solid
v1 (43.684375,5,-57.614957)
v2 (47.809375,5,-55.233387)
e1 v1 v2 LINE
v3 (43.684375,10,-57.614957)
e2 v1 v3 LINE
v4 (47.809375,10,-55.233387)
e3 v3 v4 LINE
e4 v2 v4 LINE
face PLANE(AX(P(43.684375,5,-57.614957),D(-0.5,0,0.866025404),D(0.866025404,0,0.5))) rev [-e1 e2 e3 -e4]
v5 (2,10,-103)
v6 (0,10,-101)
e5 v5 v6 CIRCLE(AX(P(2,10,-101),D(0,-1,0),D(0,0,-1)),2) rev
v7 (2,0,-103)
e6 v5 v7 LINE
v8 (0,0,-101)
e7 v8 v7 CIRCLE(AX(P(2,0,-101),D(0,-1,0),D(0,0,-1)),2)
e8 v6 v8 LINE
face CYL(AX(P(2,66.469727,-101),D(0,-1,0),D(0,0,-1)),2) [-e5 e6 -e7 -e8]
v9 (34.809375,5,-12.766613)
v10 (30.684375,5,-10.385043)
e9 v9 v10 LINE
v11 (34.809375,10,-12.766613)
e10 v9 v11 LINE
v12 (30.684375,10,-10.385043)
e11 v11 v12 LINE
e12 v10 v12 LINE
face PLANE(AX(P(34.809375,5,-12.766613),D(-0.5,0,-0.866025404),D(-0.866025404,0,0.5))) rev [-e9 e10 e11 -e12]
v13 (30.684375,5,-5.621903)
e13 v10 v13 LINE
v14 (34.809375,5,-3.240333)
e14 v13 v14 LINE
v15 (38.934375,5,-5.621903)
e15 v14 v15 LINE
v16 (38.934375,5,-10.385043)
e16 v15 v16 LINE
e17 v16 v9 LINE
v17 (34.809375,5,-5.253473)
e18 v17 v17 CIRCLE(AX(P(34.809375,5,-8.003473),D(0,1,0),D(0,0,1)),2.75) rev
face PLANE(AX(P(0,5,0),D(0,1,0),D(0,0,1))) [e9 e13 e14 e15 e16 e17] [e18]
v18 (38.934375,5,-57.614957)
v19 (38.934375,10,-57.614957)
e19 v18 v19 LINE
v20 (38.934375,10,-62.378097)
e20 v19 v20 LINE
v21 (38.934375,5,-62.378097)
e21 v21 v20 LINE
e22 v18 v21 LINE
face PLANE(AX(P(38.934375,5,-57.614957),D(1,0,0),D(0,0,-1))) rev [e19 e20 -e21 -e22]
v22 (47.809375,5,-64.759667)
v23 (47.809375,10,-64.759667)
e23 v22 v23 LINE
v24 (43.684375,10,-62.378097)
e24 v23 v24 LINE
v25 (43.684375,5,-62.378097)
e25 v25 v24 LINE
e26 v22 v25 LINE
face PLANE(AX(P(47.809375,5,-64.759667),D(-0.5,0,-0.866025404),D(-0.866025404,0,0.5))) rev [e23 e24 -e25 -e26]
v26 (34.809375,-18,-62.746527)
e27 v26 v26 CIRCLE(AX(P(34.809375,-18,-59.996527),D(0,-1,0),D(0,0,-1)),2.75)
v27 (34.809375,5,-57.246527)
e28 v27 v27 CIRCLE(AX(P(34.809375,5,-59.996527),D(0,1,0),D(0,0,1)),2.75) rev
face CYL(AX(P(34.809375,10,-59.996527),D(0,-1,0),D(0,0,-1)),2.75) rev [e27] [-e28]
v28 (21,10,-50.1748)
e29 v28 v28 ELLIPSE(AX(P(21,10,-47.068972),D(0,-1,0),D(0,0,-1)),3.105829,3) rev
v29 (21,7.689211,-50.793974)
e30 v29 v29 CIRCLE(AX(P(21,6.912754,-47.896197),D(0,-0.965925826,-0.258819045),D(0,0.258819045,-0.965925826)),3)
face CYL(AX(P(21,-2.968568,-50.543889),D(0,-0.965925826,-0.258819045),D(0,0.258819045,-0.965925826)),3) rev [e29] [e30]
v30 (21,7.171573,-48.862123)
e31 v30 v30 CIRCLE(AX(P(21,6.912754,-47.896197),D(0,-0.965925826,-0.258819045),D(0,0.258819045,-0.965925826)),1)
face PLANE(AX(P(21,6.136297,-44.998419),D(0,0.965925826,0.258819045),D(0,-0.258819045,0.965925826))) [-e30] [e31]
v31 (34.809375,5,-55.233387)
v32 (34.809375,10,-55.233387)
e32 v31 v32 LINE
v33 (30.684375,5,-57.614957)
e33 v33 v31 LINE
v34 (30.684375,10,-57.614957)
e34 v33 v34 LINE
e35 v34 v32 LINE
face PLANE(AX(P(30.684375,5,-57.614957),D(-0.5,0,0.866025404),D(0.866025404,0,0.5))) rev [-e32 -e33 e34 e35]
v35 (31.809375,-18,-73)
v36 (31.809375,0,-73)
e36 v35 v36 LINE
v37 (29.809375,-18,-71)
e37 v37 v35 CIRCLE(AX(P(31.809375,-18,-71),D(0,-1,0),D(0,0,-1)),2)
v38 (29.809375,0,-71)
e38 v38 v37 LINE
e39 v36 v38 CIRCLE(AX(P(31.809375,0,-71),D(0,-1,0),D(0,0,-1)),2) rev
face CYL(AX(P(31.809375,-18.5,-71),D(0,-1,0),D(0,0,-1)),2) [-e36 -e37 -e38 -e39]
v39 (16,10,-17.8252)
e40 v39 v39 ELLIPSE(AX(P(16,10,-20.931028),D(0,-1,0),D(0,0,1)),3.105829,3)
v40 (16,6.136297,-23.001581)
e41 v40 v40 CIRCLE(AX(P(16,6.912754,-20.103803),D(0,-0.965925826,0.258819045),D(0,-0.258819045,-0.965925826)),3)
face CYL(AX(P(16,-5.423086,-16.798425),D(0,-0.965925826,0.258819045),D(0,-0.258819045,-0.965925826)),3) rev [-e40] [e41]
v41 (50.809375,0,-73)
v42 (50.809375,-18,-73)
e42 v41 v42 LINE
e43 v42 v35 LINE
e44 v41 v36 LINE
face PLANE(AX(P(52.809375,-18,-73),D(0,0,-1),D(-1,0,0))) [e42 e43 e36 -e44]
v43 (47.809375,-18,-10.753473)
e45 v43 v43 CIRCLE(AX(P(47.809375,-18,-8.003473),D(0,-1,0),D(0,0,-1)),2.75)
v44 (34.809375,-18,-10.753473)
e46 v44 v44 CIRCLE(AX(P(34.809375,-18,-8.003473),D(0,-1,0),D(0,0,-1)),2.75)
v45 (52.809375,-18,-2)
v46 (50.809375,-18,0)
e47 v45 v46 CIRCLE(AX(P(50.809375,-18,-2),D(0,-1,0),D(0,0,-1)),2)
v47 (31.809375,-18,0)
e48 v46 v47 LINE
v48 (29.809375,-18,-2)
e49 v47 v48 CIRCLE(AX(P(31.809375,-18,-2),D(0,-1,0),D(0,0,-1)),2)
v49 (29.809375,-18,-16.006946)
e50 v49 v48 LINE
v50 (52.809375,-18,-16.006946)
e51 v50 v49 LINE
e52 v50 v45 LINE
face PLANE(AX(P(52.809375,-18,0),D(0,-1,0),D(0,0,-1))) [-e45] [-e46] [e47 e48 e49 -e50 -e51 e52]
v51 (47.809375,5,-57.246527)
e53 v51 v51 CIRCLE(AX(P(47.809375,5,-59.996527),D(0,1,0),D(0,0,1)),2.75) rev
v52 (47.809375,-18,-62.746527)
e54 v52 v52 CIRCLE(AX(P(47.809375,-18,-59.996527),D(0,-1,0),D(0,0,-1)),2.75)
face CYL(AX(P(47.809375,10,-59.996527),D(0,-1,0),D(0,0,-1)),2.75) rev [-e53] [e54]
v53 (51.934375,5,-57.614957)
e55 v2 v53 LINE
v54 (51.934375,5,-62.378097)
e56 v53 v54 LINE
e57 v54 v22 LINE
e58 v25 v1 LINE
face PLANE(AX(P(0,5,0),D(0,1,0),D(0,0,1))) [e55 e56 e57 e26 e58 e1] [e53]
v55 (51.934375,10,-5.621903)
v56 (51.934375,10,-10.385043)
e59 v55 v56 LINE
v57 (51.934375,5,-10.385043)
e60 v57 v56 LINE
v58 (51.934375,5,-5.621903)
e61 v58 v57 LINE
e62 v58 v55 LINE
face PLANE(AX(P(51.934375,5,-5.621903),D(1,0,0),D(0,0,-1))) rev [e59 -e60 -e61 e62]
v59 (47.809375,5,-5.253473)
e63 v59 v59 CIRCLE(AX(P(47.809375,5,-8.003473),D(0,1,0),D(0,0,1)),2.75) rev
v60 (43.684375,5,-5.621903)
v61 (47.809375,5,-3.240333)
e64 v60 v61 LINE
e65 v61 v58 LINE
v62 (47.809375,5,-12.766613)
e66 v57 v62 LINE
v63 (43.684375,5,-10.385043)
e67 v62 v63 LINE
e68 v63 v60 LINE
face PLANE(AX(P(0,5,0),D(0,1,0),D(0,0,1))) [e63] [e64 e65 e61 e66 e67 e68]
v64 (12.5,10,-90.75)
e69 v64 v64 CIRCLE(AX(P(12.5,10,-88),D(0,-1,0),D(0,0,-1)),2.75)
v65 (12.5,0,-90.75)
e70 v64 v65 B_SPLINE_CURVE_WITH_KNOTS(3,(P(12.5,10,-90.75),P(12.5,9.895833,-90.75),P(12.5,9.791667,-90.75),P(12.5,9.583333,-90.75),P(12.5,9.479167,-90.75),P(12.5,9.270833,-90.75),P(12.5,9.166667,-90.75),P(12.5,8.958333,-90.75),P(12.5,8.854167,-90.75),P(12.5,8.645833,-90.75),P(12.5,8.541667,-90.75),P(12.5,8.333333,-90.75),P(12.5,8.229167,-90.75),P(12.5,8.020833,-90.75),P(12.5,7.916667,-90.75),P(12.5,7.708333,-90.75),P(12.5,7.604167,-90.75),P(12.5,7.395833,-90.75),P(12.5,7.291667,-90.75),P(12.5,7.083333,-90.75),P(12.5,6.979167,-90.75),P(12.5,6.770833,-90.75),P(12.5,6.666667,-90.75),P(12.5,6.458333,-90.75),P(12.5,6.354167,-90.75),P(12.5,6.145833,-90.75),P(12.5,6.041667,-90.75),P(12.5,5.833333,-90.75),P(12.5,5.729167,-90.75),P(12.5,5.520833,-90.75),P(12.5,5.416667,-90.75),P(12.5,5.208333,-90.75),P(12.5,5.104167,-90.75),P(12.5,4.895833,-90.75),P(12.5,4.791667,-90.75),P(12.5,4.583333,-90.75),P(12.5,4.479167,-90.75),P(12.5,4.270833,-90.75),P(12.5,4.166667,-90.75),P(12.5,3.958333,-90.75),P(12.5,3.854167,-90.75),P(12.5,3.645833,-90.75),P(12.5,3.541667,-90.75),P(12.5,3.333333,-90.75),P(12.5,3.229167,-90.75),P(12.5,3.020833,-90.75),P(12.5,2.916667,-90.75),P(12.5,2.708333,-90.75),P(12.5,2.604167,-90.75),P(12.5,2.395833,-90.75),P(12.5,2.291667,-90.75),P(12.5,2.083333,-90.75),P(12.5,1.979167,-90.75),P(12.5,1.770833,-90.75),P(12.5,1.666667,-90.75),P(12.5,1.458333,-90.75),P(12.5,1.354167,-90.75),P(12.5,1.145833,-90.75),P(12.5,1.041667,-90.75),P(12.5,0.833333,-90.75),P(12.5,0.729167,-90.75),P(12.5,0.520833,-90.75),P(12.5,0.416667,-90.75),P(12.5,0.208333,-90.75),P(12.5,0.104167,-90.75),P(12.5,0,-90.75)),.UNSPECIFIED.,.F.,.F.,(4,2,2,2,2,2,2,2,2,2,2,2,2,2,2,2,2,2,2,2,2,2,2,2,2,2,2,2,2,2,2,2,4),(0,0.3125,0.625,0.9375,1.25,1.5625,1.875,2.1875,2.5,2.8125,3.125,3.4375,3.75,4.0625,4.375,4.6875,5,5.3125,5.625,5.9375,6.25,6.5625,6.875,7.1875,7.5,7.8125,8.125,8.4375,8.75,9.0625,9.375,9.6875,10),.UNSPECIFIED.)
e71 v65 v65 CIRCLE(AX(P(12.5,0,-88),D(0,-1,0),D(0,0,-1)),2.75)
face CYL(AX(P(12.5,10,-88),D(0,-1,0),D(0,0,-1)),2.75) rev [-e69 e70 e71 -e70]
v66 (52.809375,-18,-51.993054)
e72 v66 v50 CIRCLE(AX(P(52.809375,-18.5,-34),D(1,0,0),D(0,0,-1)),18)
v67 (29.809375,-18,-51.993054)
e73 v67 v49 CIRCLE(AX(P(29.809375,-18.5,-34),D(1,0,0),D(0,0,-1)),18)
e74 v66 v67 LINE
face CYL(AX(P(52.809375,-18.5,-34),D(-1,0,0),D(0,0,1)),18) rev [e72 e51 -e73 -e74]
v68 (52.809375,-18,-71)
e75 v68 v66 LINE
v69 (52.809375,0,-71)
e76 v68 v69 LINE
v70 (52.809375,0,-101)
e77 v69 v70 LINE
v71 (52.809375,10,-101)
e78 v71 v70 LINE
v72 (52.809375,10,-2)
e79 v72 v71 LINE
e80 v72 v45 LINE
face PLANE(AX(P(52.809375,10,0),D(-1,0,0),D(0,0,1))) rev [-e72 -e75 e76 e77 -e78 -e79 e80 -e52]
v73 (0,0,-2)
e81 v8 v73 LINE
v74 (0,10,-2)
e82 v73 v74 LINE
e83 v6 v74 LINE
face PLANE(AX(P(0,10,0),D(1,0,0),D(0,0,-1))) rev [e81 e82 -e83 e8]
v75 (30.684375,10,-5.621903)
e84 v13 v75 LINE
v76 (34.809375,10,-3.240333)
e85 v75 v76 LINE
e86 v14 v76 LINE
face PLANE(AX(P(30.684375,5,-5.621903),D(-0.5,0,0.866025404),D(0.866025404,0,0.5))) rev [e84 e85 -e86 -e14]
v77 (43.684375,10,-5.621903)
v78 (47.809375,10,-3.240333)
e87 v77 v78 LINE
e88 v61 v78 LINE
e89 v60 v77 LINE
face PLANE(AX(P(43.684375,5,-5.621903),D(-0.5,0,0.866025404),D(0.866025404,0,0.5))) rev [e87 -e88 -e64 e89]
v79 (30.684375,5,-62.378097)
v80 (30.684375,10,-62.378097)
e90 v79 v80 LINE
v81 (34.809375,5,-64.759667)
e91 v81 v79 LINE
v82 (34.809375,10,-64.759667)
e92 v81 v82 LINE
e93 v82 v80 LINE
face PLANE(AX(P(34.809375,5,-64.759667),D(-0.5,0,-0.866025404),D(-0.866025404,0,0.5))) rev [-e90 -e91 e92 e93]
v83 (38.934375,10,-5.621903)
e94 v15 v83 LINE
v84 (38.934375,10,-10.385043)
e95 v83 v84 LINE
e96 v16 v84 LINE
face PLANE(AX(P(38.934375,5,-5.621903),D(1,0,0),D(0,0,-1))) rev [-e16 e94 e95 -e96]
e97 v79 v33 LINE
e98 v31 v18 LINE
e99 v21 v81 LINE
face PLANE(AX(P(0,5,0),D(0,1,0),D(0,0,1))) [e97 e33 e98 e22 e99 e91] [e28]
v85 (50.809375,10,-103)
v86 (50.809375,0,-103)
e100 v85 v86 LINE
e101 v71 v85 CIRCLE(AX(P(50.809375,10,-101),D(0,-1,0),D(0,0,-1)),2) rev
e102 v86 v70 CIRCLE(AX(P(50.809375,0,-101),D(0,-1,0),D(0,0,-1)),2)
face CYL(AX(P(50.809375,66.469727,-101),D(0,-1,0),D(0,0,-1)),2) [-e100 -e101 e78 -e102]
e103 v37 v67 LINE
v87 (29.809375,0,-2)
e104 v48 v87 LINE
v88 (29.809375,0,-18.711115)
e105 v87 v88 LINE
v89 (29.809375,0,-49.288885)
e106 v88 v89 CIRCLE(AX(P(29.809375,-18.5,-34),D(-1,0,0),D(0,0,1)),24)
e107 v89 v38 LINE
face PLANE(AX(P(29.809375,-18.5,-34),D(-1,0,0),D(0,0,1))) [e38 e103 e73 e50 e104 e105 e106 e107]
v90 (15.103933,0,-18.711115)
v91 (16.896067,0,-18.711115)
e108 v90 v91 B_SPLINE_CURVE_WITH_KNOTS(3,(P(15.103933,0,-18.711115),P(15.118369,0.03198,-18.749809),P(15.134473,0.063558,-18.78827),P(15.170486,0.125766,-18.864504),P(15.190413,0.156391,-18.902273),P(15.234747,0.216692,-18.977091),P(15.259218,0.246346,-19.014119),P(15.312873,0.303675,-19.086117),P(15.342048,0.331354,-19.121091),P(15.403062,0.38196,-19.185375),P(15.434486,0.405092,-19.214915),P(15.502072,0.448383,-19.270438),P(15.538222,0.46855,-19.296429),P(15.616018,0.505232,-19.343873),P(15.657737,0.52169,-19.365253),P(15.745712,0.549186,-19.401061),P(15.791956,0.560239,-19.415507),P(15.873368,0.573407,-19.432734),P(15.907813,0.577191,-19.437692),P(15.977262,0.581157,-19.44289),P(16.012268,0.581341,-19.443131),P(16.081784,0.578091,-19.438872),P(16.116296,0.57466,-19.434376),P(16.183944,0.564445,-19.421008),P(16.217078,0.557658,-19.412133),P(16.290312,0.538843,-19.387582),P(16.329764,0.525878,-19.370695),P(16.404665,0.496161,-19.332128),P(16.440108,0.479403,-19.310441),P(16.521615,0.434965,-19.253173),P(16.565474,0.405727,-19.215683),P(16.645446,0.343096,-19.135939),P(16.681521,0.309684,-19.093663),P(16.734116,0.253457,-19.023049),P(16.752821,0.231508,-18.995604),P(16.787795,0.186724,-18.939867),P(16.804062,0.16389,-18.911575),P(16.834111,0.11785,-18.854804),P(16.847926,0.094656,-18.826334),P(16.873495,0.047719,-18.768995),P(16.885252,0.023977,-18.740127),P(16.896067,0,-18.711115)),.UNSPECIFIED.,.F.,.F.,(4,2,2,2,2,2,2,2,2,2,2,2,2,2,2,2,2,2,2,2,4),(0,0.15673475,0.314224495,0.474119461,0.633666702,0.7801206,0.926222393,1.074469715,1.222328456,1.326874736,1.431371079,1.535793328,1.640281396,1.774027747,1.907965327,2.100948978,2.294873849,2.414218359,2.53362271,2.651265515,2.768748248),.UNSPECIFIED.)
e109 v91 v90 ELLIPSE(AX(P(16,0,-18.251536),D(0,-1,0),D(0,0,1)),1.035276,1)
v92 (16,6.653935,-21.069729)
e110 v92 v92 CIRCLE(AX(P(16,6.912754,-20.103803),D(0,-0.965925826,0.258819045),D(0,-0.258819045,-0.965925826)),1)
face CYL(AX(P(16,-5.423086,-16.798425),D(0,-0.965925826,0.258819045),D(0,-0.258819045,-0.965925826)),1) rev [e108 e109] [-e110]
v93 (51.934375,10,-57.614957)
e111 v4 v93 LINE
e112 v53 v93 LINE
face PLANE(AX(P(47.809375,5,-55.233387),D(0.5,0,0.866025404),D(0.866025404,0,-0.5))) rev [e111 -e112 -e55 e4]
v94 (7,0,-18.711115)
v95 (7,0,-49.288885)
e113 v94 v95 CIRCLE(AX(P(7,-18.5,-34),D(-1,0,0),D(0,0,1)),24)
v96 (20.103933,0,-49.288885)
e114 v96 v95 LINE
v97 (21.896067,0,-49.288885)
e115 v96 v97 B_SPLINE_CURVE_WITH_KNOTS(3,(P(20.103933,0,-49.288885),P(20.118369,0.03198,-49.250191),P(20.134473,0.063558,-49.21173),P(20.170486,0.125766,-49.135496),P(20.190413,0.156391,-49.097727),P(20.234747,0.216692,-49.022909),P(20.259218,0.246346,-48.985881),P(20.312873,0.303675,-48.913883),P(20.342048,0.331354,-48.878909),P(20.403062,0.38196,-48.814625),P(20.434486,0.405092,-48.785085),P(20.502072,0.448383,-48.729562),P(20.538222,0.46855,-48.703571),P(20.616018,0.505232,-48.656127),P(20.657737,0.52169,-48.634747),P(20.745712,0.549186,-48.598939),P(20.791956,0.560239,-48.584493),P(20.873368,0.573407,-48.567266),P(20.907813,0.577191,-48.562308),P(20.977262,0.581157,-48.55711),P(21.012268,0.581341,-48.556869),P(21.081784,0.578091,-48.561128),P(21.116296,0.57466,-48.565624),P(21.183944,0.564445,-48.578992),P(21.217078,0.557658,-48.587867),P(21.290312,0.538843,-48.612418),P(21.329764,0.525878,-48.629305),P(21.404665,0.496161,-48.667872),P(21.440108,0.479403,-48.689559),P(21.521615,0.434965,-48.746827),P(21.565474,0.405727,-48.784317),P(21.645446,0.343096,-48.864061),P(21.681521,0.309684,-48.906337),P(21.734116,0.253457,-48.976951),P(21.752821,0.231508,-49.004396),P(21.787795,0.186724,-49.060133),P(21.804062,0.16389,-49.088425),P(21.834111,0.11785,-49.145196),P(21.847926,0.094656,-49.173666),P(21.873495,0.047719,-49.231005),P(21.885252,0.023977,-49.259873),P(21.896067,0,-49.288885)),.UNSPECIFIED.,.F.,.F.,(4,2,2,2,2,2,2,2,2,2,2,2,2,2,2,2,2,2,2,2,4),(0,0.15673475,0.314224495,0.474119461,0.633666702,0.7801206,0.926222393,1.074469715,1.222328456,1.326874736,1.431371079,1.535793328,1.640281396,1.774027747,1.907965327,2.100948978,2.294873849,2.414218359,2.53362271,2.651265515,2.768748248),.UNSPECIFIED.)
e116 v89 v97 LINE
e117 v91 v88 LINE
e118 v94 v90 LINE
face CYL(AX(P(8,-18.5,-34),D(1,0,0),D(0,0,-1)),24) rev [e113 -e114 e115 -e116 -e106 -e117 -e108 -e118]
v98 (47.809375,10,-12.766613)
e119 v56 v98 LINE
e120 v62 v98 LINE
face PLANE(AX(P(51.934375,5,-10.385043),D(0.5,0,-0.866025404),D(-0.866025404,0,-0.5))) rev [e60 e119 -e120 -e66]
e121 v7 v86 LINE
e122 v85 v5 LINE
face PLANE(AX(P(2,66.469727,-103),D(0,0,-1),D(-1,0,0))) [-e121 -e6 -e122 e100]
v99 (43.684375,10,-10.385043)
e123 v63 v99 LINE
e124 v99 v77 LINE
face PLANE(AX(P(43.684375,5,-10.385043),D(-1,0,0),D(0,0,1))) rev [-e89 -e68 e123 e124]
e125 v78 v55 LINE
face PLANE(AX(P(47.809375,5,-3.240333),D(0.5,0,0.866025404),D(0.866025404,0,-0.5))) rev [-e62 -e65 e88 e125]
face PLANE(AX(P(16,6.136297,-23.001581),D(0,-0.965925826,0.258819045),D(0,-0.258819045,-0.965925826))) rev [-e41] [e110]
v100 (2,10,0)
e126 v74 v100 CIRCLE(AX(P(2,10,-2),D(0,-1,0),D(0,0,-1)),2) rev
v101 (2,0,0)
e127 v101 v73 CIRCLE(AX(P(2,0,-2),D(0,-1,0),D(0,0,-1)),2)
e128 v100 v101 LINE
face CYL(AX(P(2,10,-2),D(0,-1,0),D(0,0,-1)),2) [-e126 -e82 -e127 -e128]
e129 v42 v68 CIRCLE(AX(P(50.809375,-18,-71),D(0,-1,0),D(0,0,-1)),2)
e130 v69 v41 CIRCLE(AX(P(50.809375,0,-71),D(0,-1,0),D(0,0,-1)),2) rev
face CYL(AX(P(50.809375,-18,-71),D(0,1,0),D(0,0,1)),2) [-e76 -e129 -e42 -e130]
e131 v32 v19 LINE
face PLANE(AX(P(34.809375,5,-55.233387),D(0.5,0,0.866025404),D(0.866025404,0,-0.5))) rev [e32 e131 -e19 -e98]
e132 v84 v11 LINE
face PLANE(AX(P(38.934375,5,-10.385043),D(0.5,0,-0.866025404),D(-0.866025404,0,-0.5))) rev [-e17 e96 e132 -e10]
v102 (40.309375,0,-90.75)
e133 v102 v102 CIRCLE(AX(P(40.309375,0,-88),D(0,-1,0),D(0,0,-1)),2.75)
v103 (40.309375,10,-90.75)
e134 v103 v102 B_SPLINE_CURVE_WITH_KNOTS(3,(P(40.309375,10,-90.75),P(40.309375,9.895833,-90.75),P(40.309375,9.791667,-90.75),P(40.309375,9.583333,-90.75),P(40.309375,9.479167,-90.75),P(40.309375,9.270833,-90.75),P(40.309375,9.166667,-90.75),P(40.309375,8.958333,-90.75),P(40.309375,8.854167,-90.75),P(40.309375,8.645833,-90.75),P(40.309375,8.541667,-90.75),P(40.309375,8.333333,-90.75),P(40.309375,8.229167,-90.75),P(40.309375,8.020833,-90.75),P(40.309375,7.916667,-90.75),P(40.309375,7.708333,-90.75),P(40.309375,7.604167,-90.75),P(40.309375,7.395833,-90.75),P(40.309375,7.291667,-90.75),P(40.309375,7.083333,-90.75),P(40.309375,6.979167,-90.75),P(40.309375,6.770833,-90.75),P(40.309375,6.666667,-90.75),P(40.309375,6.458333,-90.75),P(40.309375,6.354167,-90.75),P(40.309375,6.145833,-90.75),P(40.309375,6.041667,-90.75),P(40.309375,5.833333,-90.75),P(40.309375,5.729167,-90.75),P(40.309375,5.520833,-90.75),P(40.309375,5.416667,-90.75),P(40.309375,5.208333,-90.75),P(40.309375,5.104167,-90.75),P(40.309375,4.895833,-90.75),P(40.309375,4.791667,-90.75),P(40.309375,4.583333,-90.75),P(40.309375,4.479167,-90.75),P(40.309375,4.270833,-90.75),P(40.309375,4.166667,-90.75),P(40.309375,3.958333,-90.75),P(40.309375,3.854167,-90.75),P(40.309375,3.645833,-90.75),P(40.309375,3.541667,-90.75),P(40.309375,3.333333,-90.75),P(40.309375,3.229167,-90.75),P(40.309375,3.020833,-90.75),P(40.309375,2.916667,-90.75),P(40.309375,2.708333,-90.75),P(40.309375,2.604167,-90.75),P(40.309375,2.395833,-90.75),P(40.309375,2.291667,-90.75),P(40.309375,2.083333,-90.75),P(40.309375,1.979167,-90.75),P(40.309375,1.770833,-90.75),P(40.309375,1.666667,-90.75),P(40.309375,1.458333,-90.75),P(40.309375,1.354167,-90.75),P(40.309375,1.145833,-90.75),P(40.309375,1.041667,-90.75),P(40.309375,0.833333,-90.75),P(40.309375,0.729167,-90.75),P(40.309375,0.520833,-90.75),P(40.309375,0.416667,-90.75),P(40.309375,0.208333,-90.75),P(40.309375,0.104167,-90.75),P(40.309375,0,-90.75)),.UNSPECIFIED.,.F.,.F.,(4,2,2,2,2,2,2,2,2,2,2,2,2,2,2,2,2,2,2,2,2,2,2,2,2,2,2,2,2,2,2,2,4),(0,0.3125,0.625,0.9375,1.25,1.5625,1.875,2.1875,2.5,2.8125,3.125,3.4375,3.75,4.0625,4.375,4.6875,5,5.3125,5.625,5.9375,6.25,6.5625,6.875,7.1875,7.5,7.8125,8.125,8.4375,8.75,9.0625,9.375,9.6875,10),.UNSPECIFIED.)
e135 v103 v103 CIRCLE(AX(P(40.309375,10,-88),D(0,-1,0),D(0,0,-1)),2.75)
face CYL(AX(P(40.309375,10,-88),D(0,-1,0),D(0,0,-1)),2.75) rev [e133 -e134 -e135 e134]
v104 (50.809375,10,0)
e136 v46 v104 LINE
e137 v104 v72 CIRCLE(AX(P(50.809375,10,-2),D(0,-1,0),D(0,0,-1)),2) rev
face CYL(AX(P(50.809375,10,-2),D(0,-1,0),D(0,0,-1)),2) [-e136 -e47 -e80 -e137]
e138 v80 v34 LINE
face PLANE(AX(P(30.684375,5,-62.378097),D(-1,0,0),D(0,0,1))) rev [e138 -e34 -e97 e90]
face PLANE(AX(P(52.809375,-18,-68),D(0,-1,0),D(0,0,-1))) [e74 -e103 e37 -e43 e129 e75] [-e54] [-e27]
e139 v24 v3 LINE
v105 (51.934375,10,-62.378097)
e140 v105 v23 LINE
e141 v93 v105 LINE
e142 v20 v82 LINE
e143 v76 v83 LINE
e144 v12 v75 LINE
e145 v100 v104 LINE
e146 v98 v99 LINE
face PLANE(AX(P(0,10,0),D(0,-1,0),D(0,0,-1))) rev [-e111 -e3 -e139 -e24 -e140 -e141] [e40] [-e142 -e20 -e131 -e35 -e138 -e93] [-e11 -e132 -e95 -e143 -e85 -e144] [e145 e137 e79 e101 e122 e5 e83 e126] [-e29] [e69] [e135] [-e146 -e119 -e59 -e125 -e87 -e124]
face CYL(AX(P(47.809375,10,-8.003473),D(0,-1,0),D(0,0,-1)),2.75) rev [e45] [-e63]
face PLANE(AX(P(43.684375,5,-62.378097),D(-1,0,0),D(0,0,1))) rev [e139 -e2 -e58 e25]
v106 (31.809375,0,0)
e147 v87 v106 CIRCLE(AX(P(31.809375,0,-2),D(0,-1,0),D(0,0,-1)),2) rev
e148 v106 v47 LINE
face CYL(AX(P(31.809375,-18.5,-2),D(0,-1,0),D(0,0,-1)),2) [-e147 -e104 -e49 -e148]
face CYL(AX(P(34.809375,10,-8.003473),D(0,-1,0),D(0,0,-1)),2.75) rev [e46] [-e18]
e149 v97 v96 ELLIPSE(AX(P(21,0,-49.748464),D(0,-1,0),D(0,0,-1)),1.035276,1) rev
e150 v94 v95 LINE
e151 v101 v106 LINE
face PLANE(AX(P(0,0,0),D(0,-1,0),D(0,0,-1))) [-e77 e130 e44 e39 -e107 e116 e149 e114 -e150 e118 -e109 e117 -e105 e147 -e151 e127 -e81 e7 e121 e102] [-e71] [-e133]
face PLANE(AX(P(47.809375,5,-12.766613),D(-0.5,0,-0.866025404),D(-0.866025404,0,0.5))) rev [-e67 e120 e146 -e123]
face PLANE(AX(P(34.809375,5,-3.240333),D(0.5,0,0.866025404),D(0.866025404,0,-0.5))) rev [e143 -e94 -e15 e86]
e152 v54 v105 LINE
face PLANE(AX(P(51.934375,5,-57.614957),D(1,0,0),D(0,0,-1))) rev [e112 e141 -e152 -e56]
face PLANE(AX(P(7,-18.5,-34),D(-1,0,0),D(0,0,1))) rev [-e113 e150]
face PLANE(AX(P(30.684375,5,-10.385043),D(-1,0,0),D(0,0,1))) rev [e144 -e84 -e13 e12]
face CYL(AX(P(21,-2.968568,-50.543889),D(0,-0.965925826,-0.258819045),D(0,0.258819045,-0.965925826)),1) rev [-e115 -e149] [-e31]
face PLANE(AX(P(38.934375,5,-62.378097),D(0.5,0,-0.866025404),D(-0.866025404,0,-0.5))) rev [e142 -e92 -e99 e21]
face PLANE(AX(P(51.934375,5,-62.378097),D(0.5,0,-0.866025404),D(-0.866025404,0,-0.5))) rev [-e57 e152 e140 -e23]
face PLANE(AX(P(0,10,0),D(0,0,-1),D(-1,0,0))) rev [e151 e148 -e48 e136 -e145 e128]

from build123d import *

# Parameters (mm, degrees)
SKETCH1_W                       = 52.809375
SKETCH1_H                       = 85
BOSS_EXTRUDE1_DEPTH             = 10
SPRING_PULLEY_CUTOUT_DEPTH      = 10
SPRING_PULLEY_CUTOUT_DEPTH_BACK = 11
SKETCH2_R                       = 24
BOSS_EXTRUDE4_DEPTH             = 23
SKETCH20_R                      = 2.75
CUT_EXTRUDE8_DEPTH              = 104.912607935
MOVE_START                      = -18
MOVE_FACE1_OUTLINE_W            = 23
MOVE_FACE1_OUTLINE_H            = 5
MOVE_FACE1_DEPTH                = 18
MOVE_FACE3_BY                   = 1
MOVE_FACE4_BY                   = 0.809375
FILLET4_R                       = 2
BOSS_EXTRUDE5_START             = -10
BOSS_EXTRUDE5_DEPTH             = 10
SKETCH38_R                      = 2.75
CUT_EXTRUDE9_DEPTH              = 118.140215502
CUT_EXTRUDE10_DEPTH             = 5


# Read off the part's stored shape, not the designer's step: Move Face1
with BuildPart() as part:
    # Sketch1 → Boss-Extrude1 (new body)
    with BuildSketch(Plane(origin=(0, 0, 0), x_dir=(1, 0, 0), z_dir=(0, 1, 0))):
        with Locations((26.4046875, 42.5)):
            Rectangle(SKETCH1_W, SKETCH1_H)
    extrude(amount=BOSS_EXTRUDE1_DEPTH)

    # Sketch2 → spring_pulley_cutout (cut, two sides: drawn at the far end of the back side and taken through both)
    with BuildSketch(Plane.ZY.offset(-18).offset(-SPRING_PULLEY_CUTOUT_DEPTH_BACK)):
        with Locations((-34, -18.5)):
            Circle(SKETCH2_R)
    extrude(amount=SPRING_PULLEY_CUTOUT_DEPTH + SPRING_PULLEY_CUTOUT_DEPTH_BACK, mode=Mode.SUBTRACT)

    # Sketch34 → Cut-Revolve1 (revolve, cut)
    with BuildSketch(Plane(origin=(16, 0, 0), x_dir=(0, 0, -1), z_dir=(1, 0, 0))):
        Polygon((16.798424815, -5.423086457), (21.139079438, 10.776457135), (24.036856917, 10), (23.001580737, 6.136296695), (21.069729084, 6.653934785), (17.764350642, -5.681905502), align=None)
    revolve(axis=Axis((16, -5.423086457, -16.798424815), (0, 0.9659258262890682, -0.2588190451025213)), mode=Mode.SUBTRACT)

    # Sketch36 → Cut-Revolve2 (revolve, cut)
    with BuildSketch(Plane(origin=(21, 0, 0), x_dir=(0, 0, -1), z_dir=(1, 0, 0)), mode=Mode.PRIVATE) as cut_revolve2_sk:
        Polygon((50.543888978, -2.968568117), (46.860920562, 10.776457135), (43.963143083, 10), (44.998419263, 6.136296695), (46.930270916, 6.653934785), (49.577963152, -3.227387162), align=None)
    revolve(cut_revolve2_sk.sketch.rotate(Axis((21, -2.968568117, -50.543888978), (0, 0.9659258262890665, 0.2588190451025275)), 180), axis=Axis((21, -2.968568117, -50.543888978), (0, 0.9659258262890665, 0.2588190451025275)), mode=Mode.SUBTRACT)

    # Sketch19 → Boss-Extrude4 (add)
    with BuildSketch(Plane.ZY.offset(-29.809375)):
        with BuildLine():
            Line((-68, -18), (-68, 0))
            Line((-68, 0), (0, 0))
            Line((0, 0), (0, -18))
            Line((0, -18), (-16.006945785, -18))
            ThreePointArc((-16.006945785, -18), (-34, -0.5), (-51.993054215, -18))
            Line((-51.993054215, -18), (-68, -18))
        make_face()
    extrude(amount=-BOSS_EXTRUDE4_DEPTH)

    # Sketch20 → Cut-Extrude8 (cut, through all)
    with BuildSketch(Plane(origin=(0, -18, 0), x_dir=(-1, 0, 0), z_dir=(0, -1, 0))):
        with Locations(Location((-47.809375, 8.003472892, 0), (0, 0, 90))):
            Circle(SKETCH20_R)
        with Locations(Location((-34.809375, 8.003472892, 0), (0, 0, 90))):
            Circle(SKETCH20_R)
        with Locations(Location((-47.809375, 59.996527108, 0), (0, 0, 90))):
            Circle(SKETCH20_R)
        with Locations(Location((-34.809375, 59.996527108, 0), (0, 0, 90))):
            Circle(SKETCH20_R)
    extrude(amount=-CUT_EXTRUDE8_DEPTH, mode=Mode.SUBTRACT)

    # Move Face1 outline → Move Face1 (add)
    with BuildSketch(Plane(origin=(0, 0, 0), x_dir=(1, 0, 0), z_dir=(0, 1, 0)).offset(MOVE_START)):
        with Locations((41.309375, 70.5)):
            Rectangle(MOVE_FACE1_OUTLINE_W, MOVE_FACE1_OUTLINE_H)
    extrude(amount=MOVE_FACE1_DEPTH)

    # Move Face3: a face moved inward by 1.0
    extrude(part.faces().sort_by_distance((8, 2.223147927, -34))[0], amount=MOVE_FACE3_BY, dir=(-1, 0, 0), mode=Mode.SUBTRACT)

    # Move Face4: a face moved inward by 0.809375
    extrude(part.faces().sort_by_distance((29, 2.223147927, -34))[0], amount=MOVE_FACE4_BY, dir=(1, 0, 0), mode=Mode.SUBTRACT)

    # Fillet4
    fillet4_edges = [part.edges().sort_by_distance(p)[0] for p in [
        (52.809375, -9, -73),
        (29.809375, -9, 0),
        (29.809375, -9, -73),
        (0, 5, -85),
        (52.809375, 5, -85),
        (52.809375, -4, 0),
        (0, 5, 0),
    ]]
    fillet(fillet4_edges, radius=FILLET4_R)

    # Sketch37 → Boss-Extrude5 (add)
    with BuildSketch(Plane.XZ.offset(BOSS_EXTRUDE5_START)):
        with BuildLine():
            Line((0, -83), (0, -101))
            ThreePointArc((0, -101), (0.585786438, -102.414213562), (2, -103))
            Line((2, -103), (50.809375, -103))
            ThreePointArc((50.809375, -103), (52.223588562, -102.414213562), (52.809375, -101))
            Line((52.809375, -101), (52.809375, -83))
            ThreePointArc((52.809375, -83), (52.223588562, -84.414213562), (50.809375, -85))
            Line((50.809375, -85), (2, -85))
            ThreePointArc((2, -85), (0.585786438, -84.414213562), (0, -83))
        make_face()
    extrude(amount=BOSS_EXTRUDE5_DEPTH)

    # Sketch38 → Cut-Extrude9 (cut, through all)
    with BuildSketch(Plane.XZ):
        with Locations(Location((12.5, -88, 0), (0, 0, 270))):
            Circle(SKETCH38_R)
        with Locations(Location((40.309375, -88, 0), (0, 0, 270))):
            Circle(SKETCH38_R)
    extrude(amount=-CUT_EXTRUDE9_DEPTH, mode=Mode.SUBTRACT)

    # Sketch39 → Cut-Extrude10 (cut)
    with BuildSketch(Plane(origin=(0, 10, 0), x_dir=(1, 0, 0), z_dir=(0, 1, 0))):
        Polygon((47.809375, 64.759666829), (43.684375, 62.378096968), (43.684375, 57.614957247), (47.809375, 55.233387387), (51.934375, 57.614957247), (51.934375, 62.378096968), align=None)
        Polygon((34.809375, 64.759666829), (30.684375, 62.378096968), (30.684375, 57.614957247), (34.809375, 55.233387387), (38.934375, 57.614957247), (38.934375, 62.378096968), align=None)
        Polygon((34.809375, 12.766612613), (30.684375, 10.385042753), (30.684375, 5.621903032), (34.809375, 3.240333171), (38.934375, 5.621903032), (38.934375, 10.385042753), align=None)
        Polygon((47.809375, 12.766612613), (43.684375, 10.385042753), (43.684375, 5.621903032), (47.809375, 3.240333171), (51.934375, 5.621903032), (51.934375, 10.385042753), align=None)
    extrude(amount=-CUT_EXTRUDE10_DEPTH, mode=Mode.SUBTRACT)


solid = part.part
